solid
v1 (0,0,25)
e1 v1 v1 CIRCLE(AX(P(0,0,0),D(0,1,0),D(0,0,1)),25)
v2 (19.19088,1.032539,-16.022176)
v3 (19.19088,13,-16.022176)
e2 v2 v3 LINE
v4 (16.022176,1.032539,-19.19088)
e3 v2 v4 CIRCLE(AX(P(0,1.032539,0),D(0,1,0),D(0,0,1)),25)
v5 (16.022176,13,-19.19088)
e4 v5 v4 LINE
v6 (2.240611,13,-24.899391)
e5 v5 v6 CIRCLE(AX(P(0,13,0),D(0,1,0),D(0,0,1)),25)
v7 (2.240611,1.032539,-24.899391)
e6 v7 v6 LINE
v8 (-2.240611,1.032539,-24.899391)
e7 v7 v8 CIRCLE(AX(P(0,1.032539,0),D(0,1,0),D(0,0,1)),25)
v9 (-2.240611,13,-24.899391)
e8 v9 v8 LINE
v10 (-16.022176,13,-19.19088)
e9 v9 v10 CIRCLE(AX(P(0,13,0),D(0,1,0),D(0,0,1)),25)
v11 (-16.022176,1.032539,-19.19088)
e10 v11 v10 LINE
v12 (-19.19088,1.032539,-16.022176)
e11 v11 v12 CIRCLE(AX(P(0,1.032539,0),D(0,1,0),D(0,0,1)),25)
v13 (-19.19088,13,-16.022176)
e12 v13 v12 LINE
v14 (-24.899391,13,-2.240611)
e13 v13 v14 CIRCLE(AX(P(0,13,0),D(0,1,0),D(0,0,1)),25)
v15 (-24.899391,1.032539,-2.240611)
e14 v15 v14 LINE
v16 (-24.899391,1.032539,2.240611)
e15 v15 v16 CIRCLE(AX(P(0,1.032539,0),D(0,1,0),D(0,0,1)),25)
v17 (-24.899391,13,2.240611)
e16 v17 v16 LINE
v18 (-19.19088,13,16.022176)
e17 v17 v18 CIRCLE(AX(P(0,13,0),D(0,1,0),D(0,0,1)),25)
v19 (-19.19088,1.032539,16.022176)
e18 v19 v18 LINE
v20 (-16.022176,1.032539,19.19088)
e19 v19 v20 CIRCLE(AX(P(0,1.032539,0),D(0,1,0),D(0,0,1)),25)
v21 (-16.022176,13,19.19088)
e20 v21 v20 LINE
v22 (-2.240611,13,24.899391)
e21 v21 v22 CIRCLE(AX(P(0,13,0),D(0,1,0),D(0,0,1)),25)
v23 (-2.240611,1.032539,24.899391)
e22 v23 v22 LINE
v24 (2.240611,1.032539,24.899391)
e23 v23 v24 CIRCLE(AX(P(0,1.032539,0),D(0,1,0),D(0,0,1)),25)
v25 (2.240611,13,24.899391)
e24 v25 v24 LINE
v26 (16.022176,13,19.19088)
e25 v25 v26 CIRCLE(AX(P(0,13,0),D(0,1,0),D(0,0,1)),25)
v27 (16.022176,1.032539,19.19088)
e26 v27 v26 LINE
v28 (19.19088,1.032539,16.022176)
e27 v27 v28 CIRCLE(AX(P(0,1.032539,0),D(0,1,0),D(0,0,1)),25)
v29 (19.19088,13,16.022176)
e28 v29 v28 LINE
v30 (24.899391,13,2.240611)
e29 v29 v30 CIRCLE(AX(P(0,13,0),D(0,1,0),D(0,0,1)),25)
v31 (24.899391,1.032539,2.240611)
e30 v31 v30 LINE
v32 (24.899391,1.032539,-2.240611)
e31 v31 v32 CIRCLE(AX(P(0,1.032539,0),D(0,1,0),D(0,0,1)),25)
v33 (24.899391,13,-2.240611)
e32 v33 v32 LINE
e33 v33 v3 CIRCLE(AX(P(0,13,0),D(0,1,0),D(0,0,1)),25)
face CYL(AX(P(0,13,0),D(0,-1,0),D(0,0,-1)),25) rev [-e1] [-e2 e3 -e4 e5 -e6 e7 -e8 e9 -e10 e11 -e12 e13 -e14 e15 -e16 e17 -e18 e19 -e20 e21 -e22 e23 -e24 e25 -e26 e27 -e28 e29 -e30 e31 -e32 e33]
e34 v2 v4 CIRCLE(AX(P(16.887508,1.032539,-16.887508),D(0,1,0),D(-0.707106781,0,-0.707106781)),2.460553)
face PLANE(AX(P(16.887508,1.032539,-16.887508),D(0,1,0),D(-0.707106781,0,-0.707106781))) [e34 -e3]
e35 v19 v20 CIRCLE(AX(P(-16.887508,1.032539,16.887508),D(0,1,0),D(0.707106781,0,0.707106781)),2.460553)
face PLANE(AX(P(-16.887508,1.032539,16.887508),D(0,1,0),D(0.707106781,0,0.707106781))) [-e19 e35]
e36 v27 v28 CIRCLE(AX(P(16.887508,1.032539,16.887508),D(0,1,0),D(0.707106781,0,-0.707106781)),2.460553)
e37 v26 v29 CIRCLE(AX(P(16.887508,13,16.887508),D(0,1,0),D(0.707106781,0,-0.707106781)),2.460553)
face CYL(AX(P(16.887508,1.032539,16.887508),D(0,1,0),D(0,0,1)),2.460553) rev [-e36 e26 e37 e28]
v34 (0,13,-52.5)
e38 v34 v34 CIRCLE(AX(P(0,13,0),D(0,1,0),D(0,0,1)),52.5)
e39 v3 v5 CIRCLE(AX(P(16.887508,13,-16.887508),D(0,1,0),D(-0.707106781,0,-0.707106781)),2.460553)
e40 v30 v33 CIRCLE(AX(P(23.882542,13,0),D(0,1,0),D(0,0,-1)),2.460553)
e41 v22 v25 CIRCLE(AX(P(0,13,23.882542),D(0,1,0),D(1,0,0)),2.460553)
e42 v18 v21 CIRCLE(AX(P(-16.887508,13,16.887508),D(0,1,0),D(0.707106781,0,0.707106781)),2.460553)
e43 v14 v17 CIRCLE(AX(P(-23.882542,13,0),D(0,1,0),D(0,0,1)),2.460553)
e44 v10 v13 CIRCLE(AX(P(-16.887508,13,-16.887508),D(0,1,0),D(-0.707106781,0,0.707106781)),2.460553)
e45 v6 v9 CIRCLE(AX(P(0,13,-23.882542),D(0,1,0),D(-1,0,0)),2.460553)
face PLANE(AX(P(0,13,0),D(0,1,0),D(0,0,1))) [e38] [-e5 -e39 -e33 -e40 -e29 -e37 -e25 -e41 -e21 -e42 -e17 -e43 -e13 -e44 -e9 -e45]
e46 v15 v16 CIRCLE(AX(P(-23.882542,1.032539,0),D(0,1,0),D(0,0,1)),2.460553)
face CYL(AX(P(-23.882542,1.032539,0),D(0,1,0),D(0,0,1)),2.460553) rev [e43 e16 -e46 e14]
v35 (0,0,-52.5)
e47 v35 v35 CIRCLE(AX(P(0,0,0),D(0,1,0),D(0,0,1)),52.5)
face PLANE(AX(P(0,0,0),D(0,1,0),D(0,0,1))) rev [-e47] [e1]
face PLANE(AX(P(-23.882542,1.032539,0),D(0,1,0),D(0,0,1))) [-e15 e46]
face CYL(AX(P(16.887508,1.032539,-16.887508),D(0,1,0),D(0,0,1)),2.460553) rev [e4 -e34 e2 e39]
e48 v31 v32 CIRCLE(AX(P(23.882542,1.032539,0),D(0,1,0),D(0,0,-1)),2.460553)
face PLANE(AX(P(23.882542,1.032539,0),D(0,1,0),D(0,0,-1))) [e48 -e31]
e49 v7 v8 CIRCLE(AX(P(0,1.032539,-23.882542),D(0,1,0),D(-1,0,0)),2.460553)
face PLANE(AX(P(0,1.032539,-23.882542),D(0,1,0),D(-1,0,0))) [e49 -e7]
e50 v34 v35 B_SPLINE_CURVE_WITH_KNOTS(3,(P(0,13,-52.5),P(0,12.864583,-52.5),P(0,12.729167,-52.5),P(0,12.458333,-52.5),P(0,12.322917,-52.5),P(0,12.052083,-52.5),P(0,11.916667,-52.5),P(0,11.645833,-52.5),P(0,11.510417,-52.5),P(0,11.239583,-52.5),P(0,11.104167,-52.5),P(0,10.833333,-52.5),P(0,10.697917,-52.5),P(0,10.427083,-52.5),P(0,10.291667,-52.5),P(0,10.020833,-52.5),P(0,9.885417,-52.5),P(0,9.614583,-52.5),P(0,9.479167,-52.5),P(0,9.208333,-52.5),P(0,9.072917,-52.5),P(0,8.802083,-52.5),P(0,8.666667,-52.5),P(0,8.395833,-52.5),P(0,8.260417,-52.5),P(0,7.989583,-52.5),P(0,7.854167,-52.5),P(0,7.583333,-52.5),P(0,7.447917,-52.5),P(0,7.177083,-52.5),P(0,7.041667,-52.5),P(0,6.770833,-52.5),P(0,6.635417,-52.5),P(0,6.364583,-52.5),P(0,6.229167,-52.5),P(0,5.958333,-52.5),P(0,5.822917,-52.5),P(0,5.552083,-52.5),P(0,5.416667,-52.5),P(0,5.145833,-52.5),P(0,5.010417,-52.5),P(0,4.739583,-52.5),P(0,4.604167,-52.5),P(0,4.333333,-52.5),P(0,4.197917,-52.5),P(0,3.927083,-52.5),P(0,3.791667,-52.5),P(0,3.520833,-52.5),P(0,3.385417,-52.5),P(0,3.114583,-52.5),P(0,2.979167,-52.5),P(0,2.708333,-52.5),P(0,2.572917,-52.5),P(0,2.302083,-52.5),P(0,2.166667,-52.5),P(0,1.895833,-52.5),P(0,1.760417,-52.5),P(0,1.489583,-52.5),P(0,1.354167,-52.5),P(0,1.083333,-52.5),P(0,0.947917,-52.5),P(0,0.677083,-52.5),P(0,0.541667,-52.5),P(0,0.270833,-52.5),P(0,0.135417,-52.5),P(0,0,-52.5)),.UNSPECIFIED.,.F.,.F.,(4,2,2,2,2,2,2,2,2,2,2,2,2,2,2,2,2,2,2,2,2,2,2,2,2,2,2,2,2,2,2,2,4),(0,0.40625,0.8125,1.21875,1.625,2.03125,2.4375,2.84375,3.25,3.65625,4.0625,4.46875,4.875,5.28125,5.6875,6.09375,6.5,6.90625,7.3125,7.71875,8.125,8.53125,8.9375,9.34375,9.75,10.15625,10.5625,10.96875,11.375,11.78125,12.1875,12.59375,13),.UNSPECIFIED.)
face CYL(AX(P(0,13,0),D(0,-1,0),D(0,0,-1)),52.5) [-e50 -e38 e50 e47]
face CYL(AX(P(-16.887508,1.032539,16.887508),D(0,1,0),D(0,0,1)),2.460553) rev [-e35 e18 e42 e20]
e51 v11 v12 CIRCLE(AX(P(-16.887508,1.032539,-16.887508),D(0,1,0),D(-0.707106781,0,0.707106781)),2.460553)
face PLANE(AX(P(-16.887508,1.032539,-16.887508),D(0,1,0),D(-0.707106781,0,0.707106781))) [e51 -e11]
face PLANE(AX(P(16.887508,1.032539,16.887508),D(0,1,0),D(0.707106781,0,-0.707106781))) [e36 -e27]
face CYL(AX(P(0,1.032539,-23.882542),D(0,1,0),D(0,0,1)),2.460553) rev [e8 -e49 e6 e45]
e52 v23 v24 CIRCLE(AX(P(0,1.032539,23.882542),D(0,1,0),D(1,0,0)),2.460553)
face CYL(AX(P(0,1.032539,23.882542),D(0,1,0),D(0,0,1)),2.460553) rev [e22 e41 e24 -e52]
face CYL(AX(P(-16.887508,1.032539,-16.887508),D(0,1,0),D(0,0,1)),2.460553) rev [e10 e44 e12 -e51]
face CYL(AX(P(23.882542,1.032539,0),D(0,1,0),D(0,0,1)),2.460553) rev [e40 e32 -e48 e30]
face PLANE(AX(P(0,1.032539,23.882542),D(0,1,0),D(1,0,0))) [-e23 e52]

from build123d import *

# Parameters (mm, degrees)
SKETCH1_R           = 52.5
BOSS_EXTRUDE1_DEPTH = 13
SKETCH2_R           = 25
CUT_EXTRUDE1_DEPTH  = 76.375725535
SKETCH3_R           = 2.460552854
CUT_EXTRUDE2_DEPTH  = 11.967461035
CIRPATTERN1_COUNT   = 8


with BuildPart() as part:
    # Sketch1 → Boss-Extrude1 (new body)
    with BuildSketch(Plane(origin=(0, 0, 0), x_dir=(1, 0, 0), z_dir=(0, 1, 0))):
        Circle(SKETCH1_R)
    extrude(amount=BOSS_EXTRUDE1_DEPTH)

    # Sketch2 → Cut-Extrude1 (cut, through all)
    with BuildSketch(Plane(origin=(0, 0, 0), x_dir=(1, 0, 0), z_dir=(0, 1, 0))):
        Circle(SKETCH2_R)
    extrude(amount=CUT_EXTRUDE1_DEPTH, mode=Mode.SUBTRACT)

    # Sketch3 → Cut-Extrude2 (cut)
    with BuildSketch(Plane(origin=(0, 13, 0), x_dir=(1, 0, 0), z_dir=(0, 1, 0))):
        with Locations((-23.882542415, 0)):
            Circle(SKETCH3_R)
    cut_extrude2 = extrude(amount=-CUT_EXTRUDE2_DEPTH, mode=Mode.SUBTRACT)

    # CirPattern1: Cut-Extrude2 ×8 about axis
    cirpattern1_axis = Axis((0, 0, 0), (0, 1, 0))
    for i in range(1, CIRPATTERN1_COUNT):
        add(cut_extrude2.rotate(cirpattern1_axis, i * 360 / CIRPATTERN1_COUNT), mode=Mode.SUBTRACT)


solid = part.part
